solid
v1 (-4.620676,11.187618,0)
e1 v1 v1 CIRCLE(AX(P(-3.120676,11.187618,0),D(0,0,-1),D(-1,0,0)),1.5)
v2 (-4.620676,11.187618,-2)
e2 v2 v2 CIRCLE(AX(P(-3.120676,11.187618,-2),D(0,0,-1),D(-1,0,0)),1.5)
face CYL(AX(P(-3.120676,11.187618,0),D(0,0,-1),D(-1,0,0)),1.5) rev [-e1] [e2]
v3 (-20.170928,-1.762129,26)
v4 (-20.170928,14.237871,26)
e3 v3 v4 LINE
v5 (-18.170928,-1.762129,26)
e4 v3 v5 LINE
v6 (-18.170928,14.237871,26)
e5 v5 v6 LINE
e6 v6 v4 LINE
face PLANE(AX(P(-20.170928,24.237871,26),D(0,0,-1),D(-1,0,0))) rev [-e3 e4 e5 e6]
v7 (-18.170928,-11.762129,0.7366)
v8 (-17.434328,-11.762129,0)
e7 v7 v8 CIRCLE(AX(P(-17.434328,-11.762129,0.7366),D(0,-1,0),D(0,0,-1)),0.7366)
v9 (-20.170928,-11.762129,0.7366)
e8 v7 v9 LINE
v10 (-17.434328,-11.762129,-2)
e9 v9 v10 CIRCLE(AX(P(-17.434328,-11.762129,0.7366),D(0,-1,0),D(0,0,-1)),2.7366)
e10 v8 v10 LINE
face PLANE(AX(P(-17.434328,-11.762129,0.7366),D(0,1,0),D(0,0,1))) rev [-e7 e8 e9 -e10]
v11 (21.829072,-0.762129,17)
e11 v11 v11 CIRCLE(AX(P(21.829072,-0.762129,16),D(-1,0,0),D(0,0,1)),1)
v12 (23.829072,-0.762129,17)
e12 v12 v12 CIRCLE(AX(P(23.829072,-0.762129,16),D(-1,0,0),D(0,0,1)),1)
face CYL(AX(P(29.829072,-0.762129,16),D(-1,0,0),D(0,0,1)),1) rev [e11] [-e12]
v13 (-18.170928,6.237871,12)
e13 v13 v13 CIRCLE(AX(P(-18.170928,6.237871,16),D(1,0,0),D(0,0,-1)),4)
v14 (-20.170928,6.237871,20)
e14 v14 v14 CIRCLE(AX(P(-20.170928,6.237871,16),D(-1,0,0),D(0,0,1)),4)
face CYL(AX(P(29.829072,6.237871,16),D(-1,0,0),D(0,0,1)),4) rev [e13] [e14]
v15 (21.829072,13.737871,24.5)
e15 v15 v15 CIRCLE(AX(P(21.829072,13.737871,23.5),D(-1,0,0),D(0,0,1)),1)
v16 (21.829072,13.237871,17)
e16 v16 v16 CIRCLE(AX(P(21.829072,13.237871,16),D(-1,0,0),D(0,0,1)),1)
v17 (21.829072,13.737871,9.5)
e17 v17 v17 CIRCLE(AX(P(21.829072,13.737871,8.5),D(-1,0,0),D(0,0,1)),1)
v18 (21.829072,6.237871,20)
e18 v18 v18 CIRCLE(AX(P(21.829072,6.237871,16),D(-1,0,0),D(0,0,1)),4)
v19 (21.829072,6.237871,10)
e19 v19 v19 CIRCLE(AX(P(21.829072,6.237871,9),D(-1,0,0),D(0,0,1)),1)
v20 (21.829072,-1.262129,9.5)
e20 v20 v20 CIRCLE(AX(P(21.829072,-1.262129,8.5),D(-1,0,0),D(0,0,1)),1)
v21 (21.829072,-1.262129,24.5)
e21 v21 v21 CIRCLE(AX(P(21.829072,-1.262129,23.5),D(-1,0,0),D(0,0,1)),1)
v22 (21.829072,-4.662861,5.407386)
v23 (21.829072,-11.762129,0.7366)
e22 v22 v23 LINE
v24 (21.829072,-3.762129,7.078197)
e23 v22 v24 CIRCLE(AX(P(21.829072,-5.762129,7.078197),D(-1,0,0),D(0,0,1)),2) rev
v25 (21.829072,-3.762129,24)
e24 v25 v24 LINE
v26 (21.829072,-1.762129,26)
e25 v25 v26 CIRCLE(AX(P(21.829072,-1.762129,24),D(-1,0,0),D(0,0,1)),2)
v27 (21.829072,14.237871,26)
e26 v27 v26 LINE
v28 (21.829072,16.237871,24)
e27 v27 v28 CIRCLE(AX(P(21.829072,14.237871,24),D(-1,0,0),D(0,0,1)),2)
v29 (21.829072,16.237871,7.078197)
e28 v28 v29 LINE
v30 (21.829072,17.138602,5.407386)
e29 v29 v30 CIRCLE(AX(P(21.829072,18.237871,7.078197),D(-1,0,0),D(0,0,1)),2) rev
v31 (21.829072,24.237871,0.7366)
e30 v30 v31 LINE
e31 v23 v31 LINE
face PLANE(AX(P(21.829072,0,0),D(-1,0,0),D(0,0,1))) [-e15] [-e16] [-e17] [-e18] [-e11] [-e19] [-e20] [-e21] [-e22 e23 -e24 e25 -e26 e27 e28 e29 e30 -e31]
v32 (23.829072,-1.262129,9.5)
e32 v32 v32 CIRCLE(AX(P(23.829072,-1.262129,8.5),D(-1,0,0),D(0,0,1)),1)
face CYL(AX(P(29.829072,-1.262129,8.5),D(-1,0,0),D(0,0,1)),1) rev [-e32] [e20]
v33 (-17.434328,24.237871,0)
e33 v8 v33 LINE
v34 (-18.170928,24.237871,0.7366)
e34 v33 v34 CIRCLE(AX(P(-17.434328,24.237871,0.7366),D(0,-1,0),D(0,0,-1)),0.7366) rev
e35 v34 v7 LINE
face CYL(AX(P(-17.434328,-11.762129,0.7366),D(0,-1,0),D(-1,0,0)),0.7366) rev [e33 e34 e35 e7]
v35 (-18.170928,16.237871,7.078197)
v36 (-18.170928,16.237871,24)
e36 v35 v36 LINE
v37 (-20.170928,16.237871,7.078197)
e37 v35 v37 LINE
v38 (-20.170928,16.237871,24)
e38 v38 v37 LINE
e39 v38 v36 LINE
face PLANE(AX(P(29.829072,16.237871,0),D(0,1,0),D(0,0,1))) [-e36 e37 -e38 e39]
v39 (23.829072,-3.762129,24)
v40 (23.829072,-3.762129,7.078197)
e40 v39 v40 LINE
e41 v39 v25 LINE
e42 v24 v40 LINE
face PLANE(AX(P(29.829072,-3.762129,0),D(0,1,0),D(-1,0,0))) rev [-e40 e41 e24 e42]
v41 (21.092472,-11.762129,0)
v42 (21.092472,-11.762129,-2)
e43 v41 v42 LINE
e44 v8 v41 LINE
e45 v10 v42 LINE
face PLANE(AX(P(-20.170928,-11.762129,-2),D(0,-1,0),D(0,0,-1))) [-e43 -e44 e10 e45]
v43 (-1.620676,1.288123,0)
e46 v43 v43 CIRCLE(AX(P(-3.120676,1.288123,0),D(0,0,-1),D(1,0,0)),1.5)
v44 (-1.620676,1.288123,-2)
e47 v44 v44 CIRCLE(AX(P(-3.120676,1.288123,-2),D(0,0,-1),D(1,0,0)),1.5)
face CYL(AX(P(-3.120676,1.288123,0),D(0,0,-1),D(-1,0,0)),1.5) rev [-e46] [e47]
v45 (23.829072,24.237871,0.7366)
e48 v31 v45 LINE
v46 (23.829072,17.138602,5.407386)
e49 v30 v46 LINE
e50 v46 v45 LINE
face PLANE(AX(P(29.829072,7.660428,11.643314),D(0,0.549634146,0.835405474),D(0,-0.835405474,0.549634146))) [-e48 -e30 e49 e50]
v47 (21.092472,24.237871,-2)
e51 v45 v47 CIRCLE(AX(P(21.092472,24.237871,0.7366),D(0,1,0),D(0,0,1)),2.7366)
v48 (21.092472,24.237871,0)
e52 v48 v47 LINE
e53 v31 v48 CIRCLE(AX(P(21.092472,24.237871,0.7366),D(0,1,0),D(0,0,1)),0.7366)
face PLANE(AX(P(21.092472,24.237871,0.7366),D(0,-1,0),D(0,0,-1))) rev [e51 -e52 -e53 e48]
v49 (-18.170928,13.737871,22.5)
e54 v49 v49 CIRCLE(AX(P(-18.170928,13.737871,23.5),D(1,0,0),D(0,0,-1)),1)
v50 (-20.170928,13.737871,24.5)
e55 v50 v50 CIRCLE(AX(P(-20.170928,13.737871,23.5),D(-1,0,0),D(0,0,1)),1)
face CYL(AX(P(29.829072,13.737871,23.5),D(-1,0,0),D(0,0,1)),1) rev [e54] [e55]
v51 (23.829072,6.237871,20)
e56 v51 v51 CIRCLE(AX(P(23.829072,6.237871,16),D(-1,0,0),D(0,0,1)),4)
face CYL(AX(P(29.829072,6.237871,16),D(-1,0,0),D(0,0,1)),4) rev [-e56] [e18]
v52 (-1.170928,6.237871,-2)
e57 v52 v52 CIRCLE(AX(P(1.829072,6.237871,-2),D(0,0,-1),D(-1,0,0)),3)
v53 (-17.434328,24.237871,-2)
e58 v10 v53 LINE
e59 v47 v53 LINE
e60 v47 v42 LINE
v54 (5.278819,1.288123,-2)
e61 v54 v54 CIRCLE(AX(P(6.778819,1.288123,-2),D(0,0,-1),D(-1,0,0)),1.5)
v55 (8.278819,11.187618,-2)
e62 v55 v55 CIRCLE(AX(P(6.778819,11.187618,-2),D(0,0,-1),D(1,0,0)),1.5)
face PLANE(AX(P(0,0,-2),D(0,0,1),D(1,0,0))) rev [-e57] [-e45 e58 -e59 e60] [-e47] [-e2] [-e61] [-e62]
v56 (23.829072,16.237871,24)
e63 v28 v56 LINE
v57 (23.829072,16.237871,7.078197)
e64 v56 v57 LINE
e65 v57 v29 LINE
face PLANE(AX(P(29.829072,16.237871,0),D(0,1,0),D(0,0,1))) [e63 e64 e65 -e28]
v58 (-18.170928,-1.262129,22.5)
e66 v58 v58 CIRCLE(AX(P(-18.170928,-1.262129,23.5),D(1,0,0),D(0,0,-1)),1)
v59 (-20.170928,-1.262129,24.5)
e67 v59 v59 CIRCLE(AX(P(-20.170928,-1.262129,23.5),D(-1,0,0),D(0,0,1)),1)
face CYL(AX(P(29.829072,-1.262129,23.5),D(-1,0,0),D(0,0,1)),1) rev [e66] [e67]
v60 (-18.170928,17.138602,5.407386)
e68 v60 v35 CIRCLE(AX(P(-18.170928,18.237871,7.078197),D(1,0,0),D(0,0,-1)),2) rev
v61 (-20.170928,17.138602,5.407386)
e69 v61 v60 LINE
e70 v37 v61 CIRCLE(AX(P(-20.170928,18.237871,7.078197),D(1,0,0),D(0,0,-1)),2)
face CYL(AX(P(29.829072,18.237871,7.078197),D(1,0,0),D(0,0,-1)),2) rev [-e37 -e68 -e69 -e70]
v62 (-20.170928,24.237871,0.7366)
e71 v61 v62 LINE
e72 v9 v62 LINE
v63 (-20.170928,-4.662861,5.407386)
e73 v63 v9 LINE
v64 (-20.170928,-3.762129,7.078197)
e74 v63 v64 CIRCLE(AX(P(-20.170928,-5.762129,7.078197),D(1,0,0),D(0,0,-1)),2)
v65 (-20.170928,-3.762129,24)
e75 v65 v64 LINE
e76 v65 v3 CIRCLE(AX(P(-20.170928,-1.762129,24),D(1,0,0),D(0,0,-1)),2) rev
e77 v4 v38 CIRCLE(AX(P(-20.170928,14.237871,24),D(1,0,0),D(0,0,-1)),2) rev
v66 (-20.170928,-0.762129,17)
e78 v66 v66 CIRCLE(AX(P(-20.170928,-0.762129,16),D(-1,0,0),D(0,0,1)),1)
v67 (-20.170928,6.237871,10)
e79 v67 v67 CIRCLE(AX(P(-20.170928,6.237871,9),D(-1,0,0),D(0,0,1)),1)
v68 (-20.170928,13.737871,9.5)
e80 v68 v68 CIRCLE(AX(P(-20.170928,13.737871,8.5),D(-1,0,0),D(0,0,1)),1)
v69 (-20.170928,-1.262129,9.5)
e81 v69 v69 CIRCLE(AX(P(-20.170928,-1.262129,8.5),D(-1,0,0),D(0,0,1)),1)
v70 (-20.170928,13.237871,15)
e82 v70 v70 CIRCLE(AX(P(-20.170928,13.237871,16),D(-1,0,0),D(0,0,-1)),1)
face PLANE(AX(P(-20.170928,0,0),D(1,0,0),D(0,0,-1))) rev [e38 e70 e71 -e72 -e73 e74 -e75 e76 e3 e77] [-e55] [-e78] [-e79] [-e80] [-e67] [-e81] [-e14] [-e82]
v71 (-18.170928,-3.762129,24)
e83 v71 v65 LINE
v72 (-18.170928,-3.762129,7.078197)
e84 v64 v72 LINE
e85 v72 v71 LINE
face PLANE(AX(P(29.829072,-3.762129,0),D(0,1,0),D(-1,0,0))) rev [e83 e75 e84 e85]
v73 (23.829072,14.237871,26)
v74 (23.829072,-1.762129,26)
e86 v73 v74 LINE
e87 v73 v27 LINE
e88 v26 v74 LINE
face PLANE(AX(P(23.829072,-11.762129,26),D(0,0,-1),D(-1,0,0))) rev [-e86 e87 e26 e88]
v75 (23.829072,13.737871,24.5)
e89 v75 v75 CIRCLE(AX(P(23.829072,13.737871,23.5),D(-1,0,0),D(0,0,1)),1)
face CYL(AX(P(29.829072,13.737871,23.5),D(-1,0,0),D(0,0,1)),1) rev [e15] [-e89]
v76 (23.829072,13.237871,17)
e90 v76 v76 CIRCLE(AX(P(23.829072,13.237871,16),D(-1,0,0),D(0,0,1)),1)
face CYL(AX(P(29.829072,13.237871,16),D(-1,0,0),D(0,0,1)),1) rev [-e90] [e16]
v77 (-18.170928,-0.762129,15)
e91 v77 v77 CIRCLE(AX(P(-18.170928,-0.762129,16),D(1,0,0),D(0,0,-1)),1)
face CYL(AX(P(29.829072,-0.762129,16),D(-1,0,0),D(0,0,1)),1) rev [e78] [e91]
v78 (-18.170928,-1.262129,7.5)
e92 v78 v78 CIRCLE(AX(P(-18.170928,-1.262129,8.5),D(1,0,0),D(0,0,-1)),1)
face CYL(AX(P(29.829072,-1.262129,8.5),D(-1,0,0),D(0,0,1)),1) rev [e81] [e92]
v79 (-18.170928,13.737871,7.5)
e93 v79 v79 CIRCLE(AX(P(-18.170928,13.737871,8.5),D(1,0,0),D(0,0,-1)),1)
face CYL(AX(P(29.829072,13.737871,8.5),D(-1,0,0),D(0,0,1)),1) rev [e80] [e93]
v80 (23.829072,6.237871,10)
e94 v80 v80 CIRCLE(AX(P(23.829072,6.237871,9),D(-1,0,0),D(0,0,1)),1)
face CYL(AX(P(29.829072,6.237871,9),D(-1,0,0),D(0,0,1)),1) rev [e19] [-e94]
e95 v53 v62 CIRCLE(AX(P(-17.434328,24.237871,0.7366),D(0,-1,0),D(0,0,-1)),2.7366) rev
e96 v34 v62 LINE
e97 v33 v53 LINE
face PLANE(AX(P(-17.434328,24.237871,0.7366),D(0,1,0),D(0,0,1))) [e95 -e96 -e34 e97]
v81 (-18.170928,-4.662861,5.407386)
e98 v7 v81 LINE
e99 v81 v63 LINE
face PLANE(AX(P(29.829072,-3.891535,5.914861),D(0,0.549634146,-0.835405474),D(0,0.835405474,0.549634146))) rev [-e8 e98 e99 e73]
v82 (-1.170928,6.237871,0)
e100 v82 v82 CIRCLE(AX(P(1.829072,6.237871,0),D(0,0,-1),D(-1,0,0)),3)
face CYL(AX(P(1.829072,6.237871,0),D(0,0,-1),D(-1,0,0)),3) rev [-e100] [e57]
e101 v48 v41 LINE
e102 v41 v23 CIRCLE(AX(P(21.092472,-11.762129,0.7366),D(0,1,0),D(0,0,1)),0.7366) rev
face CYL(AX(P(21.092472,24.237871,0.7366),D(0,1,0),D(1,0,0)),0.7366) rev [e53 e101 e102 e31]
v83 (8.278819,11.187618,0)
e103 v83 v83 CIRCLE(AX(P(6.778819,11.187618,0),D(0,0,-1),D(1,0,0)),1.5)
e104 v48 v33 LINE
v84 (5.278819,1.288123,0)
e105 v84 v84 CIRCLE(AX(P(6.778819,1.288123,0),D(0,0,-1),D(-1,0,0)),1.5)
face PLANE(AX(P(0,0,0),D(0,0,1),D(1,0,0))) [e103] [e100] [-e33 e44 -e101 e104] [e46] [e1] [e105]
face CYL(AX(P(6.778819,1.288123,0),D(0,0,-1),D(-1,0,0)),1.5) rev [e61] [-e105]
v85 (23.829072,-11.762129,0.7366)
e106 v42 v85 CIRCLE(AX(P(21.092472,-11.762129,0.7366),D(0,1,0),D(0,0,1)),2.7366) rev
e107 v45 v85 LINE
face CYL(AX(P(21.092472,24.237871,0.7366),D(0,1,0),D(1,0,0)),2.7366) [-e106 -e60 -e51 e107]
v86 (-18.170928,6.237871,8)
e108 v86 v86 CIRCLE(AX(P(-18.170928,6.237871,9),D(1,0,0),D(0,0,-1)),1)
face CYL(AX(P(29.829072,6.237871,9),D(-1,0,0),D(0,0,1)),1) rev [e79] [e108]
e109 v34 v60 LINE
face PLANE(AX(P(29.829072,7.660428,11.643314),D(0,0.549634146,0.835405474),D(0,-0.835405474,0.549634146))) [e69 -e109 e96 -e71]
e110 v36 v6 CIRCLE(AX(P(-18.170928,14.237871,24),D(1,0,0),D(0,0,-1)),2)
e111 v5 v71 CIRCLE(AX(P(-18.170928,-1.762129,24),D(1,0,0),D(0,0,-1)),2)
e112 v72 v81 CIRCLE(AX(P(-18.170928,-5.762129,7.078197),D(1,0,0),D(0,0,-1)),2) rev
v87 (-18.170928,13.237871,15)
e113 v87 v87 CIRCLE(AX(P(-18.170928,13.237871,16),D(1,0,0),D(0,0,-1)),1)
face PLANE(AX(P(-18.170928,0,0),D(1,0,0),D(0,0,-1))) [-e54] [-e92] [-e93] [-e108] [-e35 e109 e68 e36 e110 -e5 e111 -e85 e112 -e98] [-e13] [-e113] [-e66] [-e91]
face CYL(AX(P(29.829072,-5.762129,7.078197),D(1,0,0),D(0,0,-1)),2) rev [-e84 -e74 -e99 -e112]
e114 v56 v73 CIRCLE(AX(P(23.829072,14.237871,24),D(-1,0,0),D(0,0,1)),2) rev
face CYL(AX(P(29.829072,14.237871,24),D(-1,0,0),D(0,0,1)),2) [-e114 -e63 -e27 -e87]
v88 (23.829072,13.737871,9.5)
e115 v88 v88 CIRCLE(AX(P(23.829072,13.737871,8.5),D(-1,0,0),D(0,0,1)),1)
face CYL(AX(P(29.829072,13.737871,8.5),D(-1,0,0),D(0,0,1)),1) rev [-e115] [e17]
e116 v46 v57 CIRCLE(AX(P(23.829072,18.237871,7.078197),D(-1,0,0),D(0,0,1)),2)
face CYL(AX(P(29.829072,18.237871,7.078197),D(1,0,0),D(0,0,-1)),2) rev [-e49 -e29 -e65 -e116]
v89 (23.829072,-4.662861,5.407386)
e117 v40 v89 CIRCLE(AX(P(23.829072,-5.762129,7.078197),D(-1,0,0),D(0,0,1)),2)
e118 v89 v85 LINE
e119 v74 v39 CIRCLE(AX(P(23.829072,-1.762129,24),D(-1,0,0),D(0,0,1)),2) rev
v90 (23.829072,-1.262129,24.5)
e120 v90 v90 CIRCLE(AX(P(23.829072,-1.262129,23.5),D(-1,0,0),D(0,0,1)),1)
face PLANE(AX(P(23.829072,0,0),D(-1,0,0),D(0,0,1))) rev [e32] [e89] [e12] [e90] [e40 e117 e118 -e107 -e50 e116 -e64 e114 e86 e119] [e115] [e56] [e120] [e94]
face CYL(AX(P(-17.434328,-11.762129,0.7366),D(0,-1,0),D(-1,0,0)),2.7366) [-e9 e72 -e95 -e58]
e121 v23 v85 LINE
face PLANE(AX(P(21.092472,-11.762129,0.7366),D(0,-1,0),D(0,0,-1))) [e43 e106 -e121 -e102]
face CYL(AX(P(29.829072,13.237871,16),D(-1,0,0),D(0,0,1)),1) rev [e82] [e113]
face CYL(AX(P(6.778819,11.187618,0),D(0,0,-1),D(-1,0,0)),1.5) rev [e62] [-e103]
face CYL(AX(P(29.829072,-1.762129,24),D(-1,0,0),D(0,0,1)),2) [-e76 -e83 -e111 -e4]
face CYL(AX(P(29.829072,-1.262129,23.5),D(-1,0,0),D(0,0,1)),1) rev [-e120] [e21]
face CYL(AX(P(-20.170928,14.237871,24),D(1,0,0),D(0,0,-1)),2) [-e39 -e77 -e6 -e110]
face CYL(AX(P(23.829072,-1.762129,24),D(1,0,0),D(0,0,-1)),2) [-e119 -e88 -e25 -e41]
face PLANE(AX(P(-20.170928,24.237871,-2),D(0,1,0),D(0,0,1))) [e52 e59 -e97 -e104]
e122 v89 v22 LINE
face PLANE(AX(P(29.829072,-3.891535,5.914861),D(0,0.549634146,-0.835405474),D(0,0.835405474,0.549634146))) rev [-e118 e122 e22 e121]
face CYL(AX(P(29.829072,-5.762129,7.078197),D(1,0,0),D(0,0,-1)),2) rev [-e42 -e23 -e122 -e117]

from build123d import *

# Parameters (mm, degrees)
SKETCH_1_W                       = 44
SKETCH_1_H                       = 36
SM_BASE_FLANGE_1_DEPTH           = 2
SM_EDGE_FLANGE_3_STRIP_W         = 9.4732
SM_EDGE_FLANGE_3_STRIP_H         = 2
SM_EDGE_FLANGE_3_STRIP_CUT_DEPTH = 36
SM_EDGE_FLANGE_3_DEPTH           = 36
SM_EDGE_FLANGE_4_STRIP_W         = 9.4732
SM_EDGE_FLANGE_4_STRIP_H         = 2
SM_EDGE_FLANGE_4_STRIP_CUT_DEPTH = 36
SM_EDGE_FLANGE_4_DEPTH           = 36
CUT_EXTRUDE_2_DEPTH              = 50
SKETCH_20_R                      = 1
CUT_EXTRUDE_3_DEPTH              = 50
FILLET_2_R                       = 2
FILLET_3_R                       = 2
FILLET_4_R                       = 2
FILLET_5_R                       = 2
FILLET_8_R                       = 2
FILLET_9_R                       = 2
FILLET_10_R                      = 2
FILLET_11_R                      = 2
SKETCH_21_R                      = 3
SKETCH_21_R_2                    = 1.5
CUT_EXTRUDE_4_DEPTH              = 2
SKETCH_22_R                      = 4
CUT_EXTRUDE_5_DEPTH              = 50


# Sheet-metal steps are written as plain solids
with BuildPart() as part:
    # Sketch 1 → 基体-法兰1 (new body)
    with BuildSketch(Plane.XY):
        with Locations((1.829071755, 6.237870574)):
            Rectangle(SKETCH_1_W, SKETCH_1_H)
    extrude(amount=-SM_BASE_FLANGE_1_DEPTH)

    # 边线-法兰3 strip (across the edge) → 边线-法兰3 strip cut (cut)
    with BuildSketch(Plane(origin=(-20.170928245, 24.237870574, 0), x_dir=(1, 0, 0), z_dir=(0, -1, 0))):
        with Locations((-2, -1)):
            Rectangle(SM_EDGE_FLANGE_3_STRIP_W, SM_EDGE_FLANGE_3_STRIP_H)
    extrude(amount=SM_EDGE_FLANGE_3_STRIP_CUT_DEPTH, mode=Mode.SUBTRACT)

    # 边线-法兰3 section (across the edge) → 边线-法兰3 (add)
    with BuildSketch(Plane(origin=(-20.170928245, 24.237870574, 0), x_dir=(1, 0, 0), z_dir=(0, -1, 0))):
        with BuildLine():
            Line((0, 0.7366), (0, 26))
            Line((0, 26), (2, 26))
            Line((2, 26), (2, 0.7366))
            ThreePointArc((2, 0.7366), (2.215745145, 0.215745145), (2.7366, 0))
            Line((2.7366, 0), (2.7366, -2))
            ThreePointArc((2.7366, -2), (0.801531583, -1.198468417), (0, 0.7366))
        make_face()
    extrude(amount=SM_EDGE_FLANGE_3_DEPTH)

    # 边线-法兰4 strip (across the edge) → 边线-法兰4 strip cut (cut)
    with BuildSketch(Plane(origin=(23.829071755, -11.762129426, 0), x_dir=(-1, 0, 0), z_dir=(0, 1, 0))):
        with Locations((-2, -1)):
            Rectangle(SM_EDGE_FLANGE_4_STRIP_W, SM_EDGE_FLANGE_4_STRIP_H)
    extrude(amount=SM_EDGE_FLANGE_4_STRIP_CUT_DEPTH, mode=Mode.SUBTRACT)

    # 边线-法兰4 section (across the edge) → 边线-法兰4 (add)
    with BuildSketch(Plane(origin=(23.829071755, -11.762129426, 0), x_dir=(-1, 0, 0), z_dir=(0, 1, 0))):
        with BuildLine():
            Line((0, 0.7366), (0, 26))
            Line((0, 26), (2, 26))
            Line((2, 26), (2, 0.7366))
            ThreePointArc((2, 0.7366), (2.215745145, 0.215745145), (2.7366, 0))
            Line((2.7366, 0), (2.7366, -2))
            ThreePointArc((2.7366, -2), (0.801531583, -1.198468417), (0, 0.7366))
        make_face()
    extrude(amount=SM_EDGE_FLANGE_4_DEPTH)

    # 草图19 → 切除-拉伸2 (cut)
    with BuildSketch(Plane.ZY.offset(20.170928245)):
        Polygon((6, 16.237870574), (26, 16.237870574), (26, 24.237870574), (0.7366, 24.237870574), align=None)
        Polygon((26, -11.762129426), (26, -3.762129426), (6, -3.762129426), (0.7366, -11.762129426), align=None)
    extrude(amount=-CUT_EXTRUDE_2_DEPTH, mode=Mode.SUBTRACT)

    # 草图20 → 切除-拉伸3 (cut)
    with BuildSketch(Plane.ZY.offset(20.170928245)):
        with Locations((23.5, 13.737870574)):
            Circle(SKETCH_20_R)
        with Locations((8.5, 13.737870574)):
            Circle(SKETCH_20_R)
        with Locations((8.5, -1.262129426)):
            Circle(SKETCH_20_R)
        with Locations((23.5, -1.262129426)):
            Circle(SKETCH_20_R)
        with Locations((9, 6.237870574)):
            Circle(SKETCH_20_R)
        with Locations((16, -0.762129426)):
            Circle(SKETCH_20_R)
        with Locations((16, 13.237870574)):
            Circle(SKETCH_20_R)
    extrude(amount=-CUT_EXTRUDE_3_DEPTH, mode=Mode.SUBTRACT)

    # 圆角2
    fillet_2_edges = [part.edges().sort_by_distance(p)[0] for p in [
        (-19.170928245, -3.762129426, 26),
    ]]
    fillet(fillet_2_edges, radius=FILLET_2_R)

    # 圆角3
    fillet_3_edges = [part.edges().sort_by_distance(p)[0] for p in [
        (-19.170928245, 16.237870574, 26),
    ]]
    fillet(fillet_3_edges, radius=FILLET_3_R)

    # 圆角4
    fillet_4_edges = [part.edges().sort_by_distance(p)[0] for p in [
        (22.829071755, 16.237870574, 26),
    ]]
    fillet(fillet_4_edges, radius=FILLET_4_R)

    # 圆角5
    fillet_5_edges = [part.edges().sort_by_distance(p)[0] for p in [
        (22.829071755, -3.762129426, 26),
    ]]
    fillet(fillet_5_edges, radius=FILLET_5_R)

    # 圆角8
    fillet_8_edges = [part.edges().sort_by_distance(p)[0] for p in [
        (22.829071755, -3.762129426, 6),
    ]]
    fillet(fillet_8_edges, radius=FILLET_8_R)

    # 圆角9
    fillet_9_edges = [part.edges().sort_by_distance(p)[0] for p in [
        (22.829071755, 16.237870574, 6),
    ]]
    fillet(fillet_9_edges, radius=FILLET_9_R)

    # 圆角10
    fillet_10_edges = [part.edges().sort_by_distance(p)[0] for p in [
        (-19.170928245, 16.237870574, 6),
    ]]
    fillet(fillet_10_edges, radius=FILLET_10_R)

    # 圆角11
    fillet_11_edges = [part.edges().sort_by_distance(p)[0] for p in [
        (-19.170928245, -3.762129426, 6),
    ]]
    fillet(fillet_11_edges, radius=FILLET_11_R)

    # 草图21 → 切除-拉伸4 (cut)
    with BuildSketch(Plane(origin=(0, 0, -2), x_dir=(-1, 0, 0), z_dir=(0, 0, -1))):
        with Locations((-1.829071755, 6.237870574)):
            Circle(SKETCH_21_R)
        with Locations((3.120675713, 11.187618042)):
            Circle(SKETCH_21_R_2)
        with Locations(Location((-6.778819223, 11.187618042, 0), (0, 0, 180))):
            Circle(SKETCH_21_R_2)
        with Locations((-6.778819223, 1.288123106)):
            Circle(SKETCH_21_R_2)
        with Locations(Location((3.120675713, 1.288123106, 0), (0, 0, 180))):
            Circle(SKETCH_21_R_2)
    extrude(amount=-CUT_EXTRUDE_4_DEPTH, mode=Mode.SUBTRACT)

    # 草图22 → 切除-拉伸5 (cut)
    with BuildSketch(Plane.ZY.offset(20.170928245)):
        with Locations((16, 6.237870574)):
            Circle(SKETCH_22_R)
    extrude(amount=-CUT_EXTRUDE_5_DEPTH, mode=Mode.SUBTRACT)


solid = part.part
